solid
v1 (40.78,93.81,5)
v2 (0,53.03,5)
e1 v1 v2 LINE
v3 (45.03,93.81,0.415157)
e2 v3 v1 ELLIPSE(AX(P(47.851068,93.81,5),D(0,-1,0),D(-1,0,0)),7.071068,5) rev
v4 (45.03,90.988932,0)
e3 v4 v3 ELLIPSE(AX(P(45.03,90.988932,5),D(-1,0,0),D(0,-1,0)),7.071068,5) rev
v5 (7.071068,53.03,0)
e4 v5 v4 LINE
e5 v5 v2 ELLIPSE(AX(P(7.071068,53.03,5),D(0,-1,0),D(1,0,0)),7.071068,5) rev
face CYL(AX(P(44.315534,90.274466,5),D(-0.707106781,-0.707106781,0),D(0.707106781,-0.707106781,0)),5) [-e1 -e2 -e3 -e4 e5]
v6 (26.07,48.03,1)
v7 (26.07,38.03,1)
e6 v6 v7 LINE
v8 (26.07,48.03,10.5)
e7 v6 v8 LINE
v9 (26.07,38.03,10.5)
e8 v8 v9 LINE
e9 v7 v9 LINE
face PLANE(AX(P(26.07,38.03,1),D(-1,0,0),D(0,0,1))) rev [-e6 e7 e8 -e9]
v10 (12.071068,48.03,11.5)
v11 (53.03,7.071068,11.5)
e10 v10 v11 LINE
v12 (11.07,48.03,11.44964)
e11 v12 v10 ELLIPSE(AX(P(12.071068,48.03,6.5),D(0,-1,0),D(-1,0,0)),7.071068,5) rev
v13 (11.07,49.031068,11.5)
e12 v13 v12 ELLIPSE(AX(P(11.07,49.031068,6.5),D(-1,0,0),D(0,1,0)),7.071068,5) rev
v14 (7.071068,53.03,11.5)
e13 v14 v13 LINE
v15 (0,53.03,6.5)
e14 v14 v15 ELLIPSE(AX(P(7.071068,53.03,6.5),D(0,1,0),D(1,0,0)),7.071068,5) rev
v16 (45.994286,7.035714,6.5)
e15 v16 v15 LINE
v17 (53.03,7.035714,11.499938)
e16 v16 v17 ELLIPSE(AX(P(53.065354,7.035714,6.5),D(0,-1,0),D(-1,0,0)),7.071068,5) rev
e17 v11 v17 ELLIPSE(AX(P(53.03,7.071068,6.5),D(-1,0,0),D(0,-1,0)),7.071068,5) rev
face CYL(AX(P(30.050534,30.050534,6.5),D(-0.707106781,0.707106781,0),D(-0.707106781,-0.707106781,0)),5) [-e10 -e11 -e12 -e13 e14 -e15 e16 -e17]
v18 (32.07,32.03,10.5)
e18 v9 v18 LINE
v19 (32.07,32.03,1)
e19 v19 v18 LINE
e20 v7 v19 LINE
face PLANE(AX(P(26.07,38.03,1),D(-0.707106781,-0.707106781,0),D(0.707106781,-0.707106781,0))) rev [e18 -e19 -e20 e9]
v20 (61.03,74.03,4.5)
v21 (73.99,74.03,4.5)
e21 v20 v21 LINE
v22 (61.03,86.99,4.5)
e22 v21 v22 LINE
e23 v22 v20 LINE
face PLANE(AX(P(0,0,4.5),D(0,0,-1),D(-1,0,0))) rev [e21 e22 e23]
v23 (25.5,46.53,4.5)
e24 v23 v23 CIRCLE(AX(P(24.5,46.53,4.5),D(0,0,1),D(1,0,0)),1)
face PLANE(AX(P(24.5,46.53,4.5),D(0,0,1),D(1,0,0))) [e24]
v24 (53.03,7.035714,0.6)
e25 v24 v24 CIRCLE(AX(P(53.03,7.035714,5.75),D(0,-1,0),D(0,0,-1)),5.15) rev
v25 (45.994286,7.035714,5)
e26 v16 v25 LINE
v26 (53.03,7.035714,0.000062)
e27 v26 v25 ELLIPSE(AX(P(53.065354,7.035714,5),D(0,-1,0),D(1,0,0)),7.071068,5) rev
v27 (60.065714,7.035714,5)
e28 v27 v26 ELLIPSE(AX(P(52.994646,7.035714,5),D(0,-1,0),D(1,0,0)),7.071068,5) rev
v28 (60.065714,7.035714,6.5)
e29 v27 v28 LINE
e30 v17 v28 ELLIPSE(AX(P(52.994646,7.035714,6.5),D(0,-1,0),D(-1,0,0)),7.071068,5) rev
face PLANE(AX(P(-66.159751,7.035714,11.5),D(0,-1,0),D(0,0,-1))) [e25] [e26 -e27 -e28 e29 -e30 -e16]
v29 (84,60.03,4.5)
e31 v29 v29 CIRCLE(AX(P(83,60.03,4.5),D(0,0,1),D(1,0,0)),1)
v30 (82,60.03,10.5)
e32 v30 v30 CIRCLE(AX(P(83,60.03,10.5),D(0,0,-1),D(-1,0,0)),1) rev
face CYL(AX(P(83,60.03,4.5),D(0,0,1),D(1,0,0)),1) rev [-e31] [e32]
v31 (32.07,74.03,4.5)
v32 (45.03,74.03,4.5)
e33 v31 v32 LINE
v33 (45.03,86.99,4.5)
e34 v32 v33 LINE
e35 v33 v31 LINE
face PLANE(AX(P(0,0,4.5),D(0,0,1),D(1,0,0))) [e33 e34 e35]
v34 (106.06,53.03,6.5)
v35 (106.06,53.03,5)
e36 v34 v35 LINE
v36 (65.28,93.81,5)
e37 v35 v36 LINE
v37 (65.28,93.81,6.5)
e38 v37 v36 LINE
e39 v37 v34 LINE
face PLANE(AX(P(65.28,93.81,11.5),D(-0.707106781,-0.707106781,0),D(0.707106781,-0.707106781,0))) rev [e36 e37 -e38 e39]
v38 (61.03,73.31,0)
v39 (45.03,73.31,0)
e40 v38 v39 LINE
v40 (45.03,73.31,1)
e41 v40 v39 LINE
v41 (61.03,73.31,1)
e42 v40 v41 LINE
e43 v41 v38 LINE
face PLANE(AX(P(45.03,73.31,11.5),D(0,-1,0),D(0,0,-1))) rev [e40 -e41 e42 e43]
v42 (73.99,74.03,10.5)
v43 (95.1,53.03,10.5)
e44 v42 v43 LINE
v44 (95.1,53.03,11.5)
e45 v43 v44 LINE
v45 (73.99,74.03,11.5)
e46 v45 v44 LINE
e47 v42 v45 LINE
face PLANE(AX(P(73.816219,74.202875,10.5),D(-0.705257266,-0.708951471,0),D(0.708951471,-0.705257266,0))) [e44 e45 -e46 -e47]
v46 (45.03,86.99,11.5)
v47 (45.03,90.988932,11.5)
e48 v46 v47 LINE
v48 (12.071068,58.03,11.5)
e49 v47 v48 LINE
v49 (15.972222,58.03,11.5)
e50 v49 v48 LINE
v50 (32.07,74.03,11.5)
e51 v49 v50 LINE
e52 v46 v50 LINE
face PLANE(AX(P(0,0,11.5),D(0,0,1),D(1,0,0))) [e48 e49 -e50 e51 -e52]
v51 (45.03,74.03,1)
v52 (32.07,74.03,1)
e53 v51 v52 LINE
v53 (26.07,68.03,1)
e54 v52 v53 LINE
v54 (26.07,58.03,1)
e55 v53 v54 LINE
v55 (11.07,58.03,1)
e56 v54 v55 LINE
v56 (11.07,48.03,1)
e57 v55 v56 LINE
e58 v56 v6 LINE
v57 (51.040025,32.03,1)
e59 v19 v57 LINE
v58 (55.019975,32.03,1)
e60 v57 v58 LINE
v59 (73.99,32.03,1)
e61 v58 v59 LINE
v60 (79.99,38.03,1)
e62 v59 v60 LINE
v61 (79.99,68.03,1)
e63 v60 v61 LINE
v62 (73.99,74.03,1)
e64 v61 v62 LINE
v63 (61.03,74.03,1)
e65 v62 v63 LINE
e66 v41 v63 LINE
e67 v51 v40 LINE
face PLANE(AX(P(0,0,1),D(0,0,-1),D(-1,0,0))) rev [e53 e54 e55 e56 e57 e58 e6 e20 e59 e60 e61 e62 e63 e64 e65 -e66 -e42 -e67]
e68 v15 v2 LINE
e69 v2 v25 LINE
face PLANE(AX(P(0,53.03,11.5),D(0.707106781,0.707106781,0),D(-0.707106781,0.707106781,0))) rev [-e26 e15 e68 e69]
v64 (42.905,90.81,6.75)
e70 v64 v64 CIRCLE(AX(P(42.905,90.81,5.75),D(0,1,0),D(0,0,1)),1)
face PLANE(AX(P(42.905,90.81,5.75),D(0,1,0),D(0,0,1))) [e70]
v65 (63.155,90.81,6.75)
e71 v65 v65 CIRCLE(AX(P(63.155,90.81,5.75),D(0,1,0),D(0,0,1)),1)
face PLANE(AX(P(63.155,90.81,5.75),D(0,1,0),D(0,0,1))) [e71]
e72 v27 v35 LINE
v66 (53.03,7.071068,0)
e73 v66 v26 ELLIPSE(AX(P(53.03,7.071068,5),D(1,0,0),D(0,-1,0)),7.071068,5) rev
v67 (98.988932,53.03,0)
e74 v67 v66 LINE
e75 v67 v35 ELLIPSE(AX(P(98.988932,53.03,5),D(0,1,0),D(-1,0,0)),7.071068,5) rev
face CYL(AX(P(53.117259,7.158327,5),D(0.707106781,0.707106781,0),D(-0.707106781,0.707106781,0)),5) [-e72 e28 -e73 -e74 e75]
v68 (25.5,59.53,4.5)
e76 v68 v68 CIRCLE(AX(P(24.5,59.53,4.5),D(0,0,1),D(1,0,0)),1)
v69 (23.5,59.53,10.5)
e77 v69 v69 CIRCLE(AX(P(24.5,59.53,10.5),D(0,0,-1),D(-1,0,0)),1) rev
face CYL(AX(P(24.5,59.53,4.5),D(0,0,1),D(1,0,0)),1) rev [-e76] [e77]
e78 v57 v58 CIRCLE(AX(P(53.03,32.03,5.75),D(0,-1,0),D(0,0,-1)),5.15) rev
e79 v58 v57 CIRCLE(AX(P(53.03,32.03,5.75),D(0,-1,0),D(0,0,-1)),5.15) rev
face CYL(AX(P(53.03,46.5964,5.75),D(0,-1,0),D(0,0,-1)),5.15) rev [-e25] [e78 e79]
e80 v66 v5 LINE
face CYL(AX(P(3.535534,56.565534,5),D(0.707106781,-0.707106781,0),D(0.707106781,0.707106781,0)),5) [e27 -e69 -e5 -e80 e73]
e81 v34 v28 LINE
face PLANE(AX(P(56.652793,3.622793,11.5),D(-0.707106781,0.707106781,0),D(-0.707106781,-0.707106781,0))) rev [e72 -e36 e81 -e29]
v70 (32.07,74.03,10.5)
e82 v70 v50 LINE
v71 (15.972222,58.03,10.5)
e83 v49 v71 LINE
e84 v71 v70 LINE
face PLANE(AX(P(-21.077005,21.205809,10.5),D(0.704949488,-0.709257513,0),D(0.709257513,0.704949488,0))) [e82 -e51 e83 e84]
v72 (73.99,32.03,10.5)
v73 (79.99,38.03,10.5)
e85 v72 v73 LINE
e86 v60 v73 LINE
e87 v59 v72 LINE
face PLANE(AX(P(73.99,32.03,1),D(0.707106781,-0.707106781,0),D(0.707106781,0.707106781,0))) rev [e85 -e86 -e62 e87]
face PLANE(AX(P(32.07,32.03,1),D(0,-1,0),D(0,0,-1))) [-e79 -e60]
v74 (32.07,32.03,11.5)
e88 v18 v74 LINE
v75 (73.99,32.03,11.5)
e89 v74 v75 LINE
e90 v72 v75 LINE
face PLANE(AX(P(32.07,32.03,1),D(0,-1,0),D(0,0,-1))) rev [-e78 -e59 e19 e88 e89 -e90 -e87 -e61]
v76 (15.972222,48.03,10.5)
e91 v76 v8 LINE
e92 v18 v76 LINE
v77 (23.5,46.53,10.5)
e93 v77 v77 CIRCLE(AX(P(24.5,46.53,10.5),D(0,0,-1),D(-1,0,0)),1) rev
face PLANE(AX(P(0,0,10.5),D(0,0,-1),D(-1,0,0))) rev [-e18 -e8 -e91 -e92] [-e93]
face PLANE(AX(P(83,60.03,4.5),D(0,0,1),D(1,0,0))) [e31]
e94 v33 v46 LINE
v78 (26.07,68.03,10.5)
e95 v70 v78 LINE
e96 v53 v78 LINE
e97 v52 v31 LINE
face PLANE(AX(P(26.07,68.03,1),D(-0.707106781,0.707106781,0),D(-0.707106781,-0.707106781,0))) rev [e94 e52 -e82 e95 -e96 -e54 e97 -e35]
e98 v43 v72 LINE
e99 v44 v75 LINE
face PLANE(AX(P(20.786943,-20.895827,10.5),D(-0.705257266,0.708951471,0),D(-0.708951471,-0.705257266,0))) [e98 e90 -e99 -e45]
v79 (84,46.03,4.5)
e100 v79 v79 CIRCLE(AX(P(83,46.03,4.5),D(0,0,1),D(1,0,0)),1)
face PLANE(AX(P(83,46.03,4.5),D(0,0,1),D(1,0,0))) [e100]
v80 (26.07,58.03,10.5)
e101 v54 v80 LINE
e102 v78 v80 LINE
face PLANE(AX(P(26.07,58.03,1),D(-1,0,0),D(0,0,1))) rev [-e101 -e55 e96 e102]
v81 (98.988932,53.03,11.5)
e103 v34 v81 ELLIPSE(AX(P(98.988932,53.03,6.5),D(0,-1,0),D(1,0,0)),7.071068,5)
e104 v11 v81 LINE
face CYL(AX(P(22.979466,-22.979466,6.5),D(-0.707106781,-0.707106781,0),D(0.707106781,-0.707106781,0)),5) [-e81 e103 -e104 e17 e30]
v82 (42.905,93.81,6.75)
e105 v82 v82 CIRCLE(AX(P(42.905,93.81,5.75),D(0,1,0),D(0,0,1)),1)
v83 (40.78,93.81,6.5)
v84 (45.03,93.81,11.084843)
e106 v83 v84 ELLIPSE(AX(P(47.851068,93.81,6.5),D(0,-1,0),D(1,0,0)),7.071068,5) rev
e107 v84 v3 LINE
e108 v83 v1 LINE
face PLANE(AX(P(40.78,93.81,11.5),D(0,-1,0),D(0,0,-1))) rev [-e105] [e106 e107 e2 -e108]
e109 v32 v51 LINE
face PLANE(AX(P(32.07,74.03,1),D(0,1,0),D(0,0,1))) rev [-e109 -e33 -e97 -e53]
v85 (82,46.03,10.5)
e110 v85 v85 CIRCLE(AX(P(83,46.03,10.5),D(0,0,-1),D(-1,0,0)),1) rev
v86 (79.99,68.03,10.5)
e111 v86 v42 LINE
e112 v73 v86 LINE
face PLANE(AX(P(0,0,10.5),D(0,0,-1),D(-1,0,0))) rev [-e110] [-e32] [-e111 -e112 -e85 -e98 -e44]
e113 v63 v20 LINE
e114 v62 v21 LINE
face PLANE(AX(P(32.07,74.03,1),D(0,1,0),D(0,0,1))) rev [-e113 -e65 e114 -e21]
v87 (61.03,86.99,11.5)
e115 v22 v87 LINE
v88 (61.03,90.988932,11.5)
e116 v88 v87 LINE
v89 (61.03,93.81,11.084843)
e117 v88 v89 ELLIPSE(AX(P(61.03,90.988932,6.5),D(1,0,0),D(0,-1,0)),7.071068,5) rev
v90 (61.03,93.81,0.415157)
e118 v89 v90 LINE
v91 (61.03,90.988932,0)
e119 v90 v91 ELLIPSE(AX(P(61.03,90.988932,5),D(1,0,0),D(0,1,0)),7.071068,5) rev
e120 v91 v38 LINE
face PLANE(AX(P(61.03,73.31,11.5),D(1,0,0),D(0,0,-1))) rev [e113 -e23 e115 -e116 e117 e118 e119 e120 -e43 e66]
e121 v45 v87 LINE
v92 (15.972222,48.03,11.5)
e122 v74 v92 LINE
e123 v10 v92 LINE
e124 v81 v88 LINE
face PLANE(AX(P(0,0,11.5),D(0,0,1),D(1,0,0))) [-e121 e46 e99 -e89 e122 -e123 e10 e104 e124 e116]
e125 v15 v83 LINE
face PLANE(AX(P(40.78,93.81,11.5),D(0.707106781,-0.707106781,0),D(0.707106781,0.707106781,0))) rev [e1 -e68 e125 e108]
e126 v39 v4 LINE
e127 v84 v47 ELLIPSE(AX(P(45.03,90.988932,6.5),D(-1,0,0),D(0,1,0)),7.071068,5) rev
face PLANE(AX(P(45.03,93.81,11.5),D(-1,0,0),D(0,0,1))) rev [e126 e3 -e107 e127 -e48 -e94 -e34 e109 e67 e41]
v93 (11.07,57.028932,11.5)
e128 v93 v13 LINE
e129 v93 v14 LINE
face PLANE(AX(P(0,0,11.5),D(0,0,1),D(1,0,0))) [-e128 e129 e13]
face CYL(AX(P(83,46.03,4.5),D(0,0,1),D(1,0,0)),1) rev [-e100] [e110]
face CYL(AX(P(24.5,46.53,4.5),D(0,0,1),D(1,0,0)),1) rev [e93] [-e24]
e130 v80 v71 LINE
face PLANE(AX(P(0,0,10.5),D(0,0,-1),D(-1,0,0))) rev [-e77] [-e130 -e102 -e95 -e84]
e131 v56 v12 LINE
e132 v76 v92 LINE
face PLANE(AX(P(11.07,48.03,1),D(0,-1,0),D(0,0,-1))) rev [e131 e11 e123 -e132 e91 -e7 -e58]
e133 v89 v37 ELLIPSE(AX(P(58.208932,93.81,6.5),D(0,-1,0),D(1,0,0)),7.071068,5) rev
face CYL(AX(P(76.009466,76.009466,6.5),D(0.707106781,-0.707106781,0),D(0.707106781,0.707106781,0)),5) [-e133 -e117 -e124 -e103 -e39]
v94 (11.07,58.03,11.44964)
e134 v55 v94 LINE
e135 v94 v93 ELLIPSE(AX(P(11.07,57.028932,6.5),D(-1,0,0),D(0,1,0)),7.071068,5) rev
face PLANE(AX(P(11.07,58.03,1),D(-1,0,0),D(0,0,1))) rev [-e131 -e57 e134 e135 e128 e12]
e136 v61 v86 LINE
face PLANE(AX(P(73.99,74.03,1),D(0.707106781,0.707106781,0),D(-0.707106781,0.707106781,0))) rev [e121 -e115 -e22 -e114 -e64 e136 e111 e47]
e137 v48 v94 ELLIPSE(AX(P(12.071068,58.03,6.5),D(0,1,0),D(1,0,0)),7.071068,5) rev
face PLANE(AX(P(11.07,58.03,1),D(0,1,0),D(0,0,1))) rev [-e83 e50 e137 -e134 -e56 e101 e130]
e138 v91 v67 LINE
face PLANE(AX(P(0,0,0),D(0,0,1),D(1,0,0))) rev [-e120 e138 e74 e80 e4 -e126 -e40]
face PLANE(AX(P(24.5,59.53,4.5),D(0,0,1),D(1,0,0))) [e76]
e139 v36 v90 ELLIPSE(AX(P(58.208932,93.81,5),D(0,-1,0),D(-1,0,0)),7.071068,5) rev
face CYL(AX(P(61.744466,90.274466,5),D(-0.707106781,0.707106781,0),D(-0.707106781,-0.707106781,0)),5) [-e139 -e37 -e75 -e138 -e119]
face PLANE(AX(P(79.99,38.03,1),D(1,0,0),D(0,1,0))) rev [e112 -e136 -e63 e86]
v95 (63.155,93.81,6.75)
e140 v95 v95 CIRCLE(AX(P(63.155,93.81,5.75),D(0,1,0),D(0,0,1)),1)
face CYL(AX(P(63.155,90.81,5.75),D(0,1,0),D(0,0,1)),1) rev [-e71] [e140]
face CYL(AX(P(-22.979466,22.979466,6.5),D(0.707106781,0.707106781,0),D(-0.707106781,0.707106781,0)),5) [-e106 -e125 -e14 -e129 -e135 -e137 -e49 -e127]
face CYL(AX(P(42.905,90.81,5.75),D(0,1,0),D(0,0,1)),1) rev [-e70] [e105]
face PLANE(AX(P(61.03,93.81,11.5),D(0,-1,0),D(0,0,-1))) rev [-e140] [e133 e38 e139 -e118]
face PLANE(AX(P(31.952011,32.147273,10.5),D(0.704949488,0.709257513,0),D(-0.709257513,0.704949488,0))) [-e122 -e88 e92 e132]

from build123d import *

# Parameters (mm, degrees)
BOSS_EXTRUDE1_DEPTH = 11.5
CUT_EXTRUDE1_DEPTH  = 10.5
CUT_EXTRUDE3_START  = 93.81
SKETCH10_R          = 1
CUT_EXTRUDE3_DEPTH  = 3
SKETCH11_R          = 5.15
CUT_EXTRUDE4_DEPTH  = 28.407206753
CUT_EXTRUDE6_START  = 11.5
CUT_EXTRUDE6_DEPTH  = 7
CUT_EXTRUDE10_START = 11.5
SKETCH17_R          = 1
CUT_EXTRUDE10_DEPTH = 7
CUT_EXTRUDE11_START = 11.5
CUT_EXTRUDE11_DEPTH = 1
FILLET1_R           = 5
FILLET2_R           = 5
SKETCH22_W          = 132.319501334
SKETCH22_H          = 14.071427362
CUT_EXTRUDE13_DEPTH = 143.060866263


with BuildPart() as part:
    # Sketch1 → Boss-Extrude1 (new body)
    with BuildSketch(Plane.XY):
        Polygon((0, 53.03), (49.407206753, 3.622793247), (56.652793247, 3.622793247), (106.06, 53.03), (65.28, 93.81), (61.03, 93.81), (61.03, 73.31), (45.03, 73.31), (45.03, 93.81), (40.78, 93.81), align=None)
    extrude(amount=BOSS_EXTRUDE1_DEPTH)

    # Sketch5 → Cut-Extrude1 (cut)
    with BuildSketch(Plane.XY.offset(11.5)):
        Polygon((26.07, 68.03), (32.07, 74.03), (73.99, 74.03), (79.99, 68.03), (79.99, 38.03), (73.99, 32.03), (32.07, 32.03), (26.07, 38.03), (26.07, 48.03), (11.07, 48.03), (11.07, 58.03), (26.07, 58.03), align=None)
    extrude(amount=-CUT_EXTRUDE1_DEPTH, mode=Mode.SUBTRACT)

    # Sketch10 → Cut-Extrude3 (cut)
    with BuildSketch(Plane(origin=(0, 0, 0), x_dir=(1, 0, 0), z_dir=(0, 1, 0)).offset(CUT_EXTRUDE3_START)):
        with Locations(Location((42.905, -5.75, 0), (0, 0, 270))):
            Circle(SKETCH10_R)
        with Locations(Location((63.155, -5.75, 0), (0, 0, 270))):
            Circle(SKETCH10_R)
    extrude(amount=-CUT_EXTRUDE3_DEPTH, mode=Mode.SUBTRACT)

    # Sketch11 → Cut-Extrude4 (cut)
    with BuildSketch(Plane.XZ.offset(-3.622793247)):
        with Locations(Location((53.03, 5.75, 0), (0, 0, 292.730860927))):
            Circle(SKETCH11_R)
    extrude(amount=-CUT_EXTRUDE4_DEPTH, mode=Mode.SUBTRACT)

    # Sketch13 → Cut-Extrude6 (cut)
    with BuildSketch(Plane.XY.offset(CUT_EXTRUDE6_START)):
        Polygon((73.99, 74.03), (61.03, 86.99), (61.03, 74.03), align=None)
        Polygon((32.07, 74.03), (45.03, 86.99), (45.03, 74.03), align=None)
    extrude(amount=-CUT_EXTRUDE6_DEPTH, mode=Mode.SUBTRACT)

    # Sketch17 → Cut-Extrude10 (cut)
    with BuildSketch(Plane.XY.offset(CUT_EXTRUDE10_START)):
        with Locations((24.5, 59.53)):
            Circle(SKETCH17_R)
        with Locations((24.5, 46.53)):
            Circle(SKETCH17_R)
        with Locations((83, 60.03)):
            Circle(SKETCH17_R)
        with Locations((83, 46.03)):
            Circle(SKETCH17_R)
    extrude(amount=-CUT_EXTRUDE10_DEPTH, mode=Mode.SUBTRACT)

    # Sketch19 → Cut-Extrude11 (cut)
    with BuildSketch(Plane.XY.offset(CUT_EXTRUDE11_START)):
        Polygon((13.96, 56.03), (13.96, 50.03), (32.07, 32.03), (73.99, 32.03), (95.1, 53.03), (73.99, 74.03), (32.07, 74.03), align=None)
    extrude(amount=-CUT_EXTRUDE11_DEPTH, mode=Mode.SUBTRACT)

    # Fillet1
    # the kernel refuses this fillet: 5 mm, written as the material it takes off along each edge
    with BuildSketch(Plane(origin=(47.813958483, -5.216041517, 11.5), x_dir=(0, 0, -1), z_dir=(0.7071067811865475, 0.7071067811865477, 0)), Plane(origin=(-8.838834765, 61.868834765, 11.5), x_dir=(0, 0, -1), z_dir=(0.7071067811865476, -0.7071067811865475, 0))) as fillet1_piece_1:
        with BuildLine():
            CenterArc((FILLET1_R, FILLET1_R), FILLET1_R, 180, 90)
            Line((0, FILLET1_R), (0, 0))
            Line((0, 0), (FILLET1_R, 0))
        make_face()
    extrude(amount=94.872341868, mode=Mode.SUBTRACT)
    with BuildSketch(Plane(origin=(49.618834765, 102.648834765, 11.5), x_dir=(0, 0, -1), z_dir=(-0.7071067811865472, -0.7071067811865479, 0)), Plane(origin=(114.898834765, 44.191165235, 11.5), x_dir=(0, 0, -1), z_dir=(-0.7071067811865476, 0.7071067811865476, 0))) as fillet1_piece_2:
        with BuildLine():
            CenterArc((FILLET1_R, FILLET1_R), FILLET1_R, 180, 90)
            Line((0, FILLET1_R), (0, 0))
            Line((0, 0), (FILLET1_R, 0))
        make_face()
    extrude(amount=82.671629074, mode=Mode.SUBTRACT)

    # Fillet2
    # the kernel refuses this fillet: 5 mm, written as the material it takes off along each edge
    with BuildSketch(Plane(origin=(49.618834765, 102.648834765, 0), x_dir=(0.7071067811865479, -0.7071067811865472, 0), z_dir=(-0.7071067811865472, -0.7071067811865479, 0)), Plane(origin=(114.898834765, 44.191165235, 0), x_dir=(-0.7071067811865476, -0.7071067811865476, 0), z_dir=(-0.7071067811865476, 0.7071067811865476, 0))) as fillet2_piece_1:
        with BuildLine():
            CenterArc((FILLET2_R, FILLET2_R), FILLET2_R, 180, 90)
            Line((0, FILLET2_R), (0, 0))
            Line((0, 0), (FILLET2_R, 0))
        make_face()
    extrude(amount=82.671629074, mode=Mode.SUBTRACT)
    with BuildSketch(Plane(origin=(-8.838834765, 61.868834765, 0), x_dir=(0, 0, 1), z_dir=(0.7071067811865476, -0.7071067811865475, 0))) as fillet2_piece_2:
        with BuildLine():
            CenterArc((FILLET2_R, -FILLET2_R), FILLET2_R, 90, 90)
            Line((0, -FILLET2_R), (0, 0))
            Line((0, 0), (FILLET2_R, 0))
        make_face()
    extrude(amount=94.872341868, mode=Mode.SUBTRACT)
    with BuildSketch(Plane(origin=(47.813958483, -5.216041517, 0), x_dir=(-0.7071067811865477, 0.7071067811865475, 0), z_dir=(0.7071067811865475, 0.7071067811865477, 0))) as fillet2_piece_3:
        with BuildLine():
            CenterArc((FILLET2_R, FILLET2_R), FILLET2_R, 180, 90)
            Line((0, FILLET2_R), (0, 0))
            Line((0, 0), (FILLET2_R, 0))
        make_face()
    extrude(amount=94.872341868, mode=Mode.SUBTRACT)

    # Sketch22 → Cut-Extrude13 (cut, through all)
    with BuildSketch(Plane.XY):
        Rectangle(SKETCH22_W, SKETCH22_H)
    extrude(amount=CUT_EXTRUDE13_DEPTH, mode=Mode.SUBTRACT)


solid = part.part
